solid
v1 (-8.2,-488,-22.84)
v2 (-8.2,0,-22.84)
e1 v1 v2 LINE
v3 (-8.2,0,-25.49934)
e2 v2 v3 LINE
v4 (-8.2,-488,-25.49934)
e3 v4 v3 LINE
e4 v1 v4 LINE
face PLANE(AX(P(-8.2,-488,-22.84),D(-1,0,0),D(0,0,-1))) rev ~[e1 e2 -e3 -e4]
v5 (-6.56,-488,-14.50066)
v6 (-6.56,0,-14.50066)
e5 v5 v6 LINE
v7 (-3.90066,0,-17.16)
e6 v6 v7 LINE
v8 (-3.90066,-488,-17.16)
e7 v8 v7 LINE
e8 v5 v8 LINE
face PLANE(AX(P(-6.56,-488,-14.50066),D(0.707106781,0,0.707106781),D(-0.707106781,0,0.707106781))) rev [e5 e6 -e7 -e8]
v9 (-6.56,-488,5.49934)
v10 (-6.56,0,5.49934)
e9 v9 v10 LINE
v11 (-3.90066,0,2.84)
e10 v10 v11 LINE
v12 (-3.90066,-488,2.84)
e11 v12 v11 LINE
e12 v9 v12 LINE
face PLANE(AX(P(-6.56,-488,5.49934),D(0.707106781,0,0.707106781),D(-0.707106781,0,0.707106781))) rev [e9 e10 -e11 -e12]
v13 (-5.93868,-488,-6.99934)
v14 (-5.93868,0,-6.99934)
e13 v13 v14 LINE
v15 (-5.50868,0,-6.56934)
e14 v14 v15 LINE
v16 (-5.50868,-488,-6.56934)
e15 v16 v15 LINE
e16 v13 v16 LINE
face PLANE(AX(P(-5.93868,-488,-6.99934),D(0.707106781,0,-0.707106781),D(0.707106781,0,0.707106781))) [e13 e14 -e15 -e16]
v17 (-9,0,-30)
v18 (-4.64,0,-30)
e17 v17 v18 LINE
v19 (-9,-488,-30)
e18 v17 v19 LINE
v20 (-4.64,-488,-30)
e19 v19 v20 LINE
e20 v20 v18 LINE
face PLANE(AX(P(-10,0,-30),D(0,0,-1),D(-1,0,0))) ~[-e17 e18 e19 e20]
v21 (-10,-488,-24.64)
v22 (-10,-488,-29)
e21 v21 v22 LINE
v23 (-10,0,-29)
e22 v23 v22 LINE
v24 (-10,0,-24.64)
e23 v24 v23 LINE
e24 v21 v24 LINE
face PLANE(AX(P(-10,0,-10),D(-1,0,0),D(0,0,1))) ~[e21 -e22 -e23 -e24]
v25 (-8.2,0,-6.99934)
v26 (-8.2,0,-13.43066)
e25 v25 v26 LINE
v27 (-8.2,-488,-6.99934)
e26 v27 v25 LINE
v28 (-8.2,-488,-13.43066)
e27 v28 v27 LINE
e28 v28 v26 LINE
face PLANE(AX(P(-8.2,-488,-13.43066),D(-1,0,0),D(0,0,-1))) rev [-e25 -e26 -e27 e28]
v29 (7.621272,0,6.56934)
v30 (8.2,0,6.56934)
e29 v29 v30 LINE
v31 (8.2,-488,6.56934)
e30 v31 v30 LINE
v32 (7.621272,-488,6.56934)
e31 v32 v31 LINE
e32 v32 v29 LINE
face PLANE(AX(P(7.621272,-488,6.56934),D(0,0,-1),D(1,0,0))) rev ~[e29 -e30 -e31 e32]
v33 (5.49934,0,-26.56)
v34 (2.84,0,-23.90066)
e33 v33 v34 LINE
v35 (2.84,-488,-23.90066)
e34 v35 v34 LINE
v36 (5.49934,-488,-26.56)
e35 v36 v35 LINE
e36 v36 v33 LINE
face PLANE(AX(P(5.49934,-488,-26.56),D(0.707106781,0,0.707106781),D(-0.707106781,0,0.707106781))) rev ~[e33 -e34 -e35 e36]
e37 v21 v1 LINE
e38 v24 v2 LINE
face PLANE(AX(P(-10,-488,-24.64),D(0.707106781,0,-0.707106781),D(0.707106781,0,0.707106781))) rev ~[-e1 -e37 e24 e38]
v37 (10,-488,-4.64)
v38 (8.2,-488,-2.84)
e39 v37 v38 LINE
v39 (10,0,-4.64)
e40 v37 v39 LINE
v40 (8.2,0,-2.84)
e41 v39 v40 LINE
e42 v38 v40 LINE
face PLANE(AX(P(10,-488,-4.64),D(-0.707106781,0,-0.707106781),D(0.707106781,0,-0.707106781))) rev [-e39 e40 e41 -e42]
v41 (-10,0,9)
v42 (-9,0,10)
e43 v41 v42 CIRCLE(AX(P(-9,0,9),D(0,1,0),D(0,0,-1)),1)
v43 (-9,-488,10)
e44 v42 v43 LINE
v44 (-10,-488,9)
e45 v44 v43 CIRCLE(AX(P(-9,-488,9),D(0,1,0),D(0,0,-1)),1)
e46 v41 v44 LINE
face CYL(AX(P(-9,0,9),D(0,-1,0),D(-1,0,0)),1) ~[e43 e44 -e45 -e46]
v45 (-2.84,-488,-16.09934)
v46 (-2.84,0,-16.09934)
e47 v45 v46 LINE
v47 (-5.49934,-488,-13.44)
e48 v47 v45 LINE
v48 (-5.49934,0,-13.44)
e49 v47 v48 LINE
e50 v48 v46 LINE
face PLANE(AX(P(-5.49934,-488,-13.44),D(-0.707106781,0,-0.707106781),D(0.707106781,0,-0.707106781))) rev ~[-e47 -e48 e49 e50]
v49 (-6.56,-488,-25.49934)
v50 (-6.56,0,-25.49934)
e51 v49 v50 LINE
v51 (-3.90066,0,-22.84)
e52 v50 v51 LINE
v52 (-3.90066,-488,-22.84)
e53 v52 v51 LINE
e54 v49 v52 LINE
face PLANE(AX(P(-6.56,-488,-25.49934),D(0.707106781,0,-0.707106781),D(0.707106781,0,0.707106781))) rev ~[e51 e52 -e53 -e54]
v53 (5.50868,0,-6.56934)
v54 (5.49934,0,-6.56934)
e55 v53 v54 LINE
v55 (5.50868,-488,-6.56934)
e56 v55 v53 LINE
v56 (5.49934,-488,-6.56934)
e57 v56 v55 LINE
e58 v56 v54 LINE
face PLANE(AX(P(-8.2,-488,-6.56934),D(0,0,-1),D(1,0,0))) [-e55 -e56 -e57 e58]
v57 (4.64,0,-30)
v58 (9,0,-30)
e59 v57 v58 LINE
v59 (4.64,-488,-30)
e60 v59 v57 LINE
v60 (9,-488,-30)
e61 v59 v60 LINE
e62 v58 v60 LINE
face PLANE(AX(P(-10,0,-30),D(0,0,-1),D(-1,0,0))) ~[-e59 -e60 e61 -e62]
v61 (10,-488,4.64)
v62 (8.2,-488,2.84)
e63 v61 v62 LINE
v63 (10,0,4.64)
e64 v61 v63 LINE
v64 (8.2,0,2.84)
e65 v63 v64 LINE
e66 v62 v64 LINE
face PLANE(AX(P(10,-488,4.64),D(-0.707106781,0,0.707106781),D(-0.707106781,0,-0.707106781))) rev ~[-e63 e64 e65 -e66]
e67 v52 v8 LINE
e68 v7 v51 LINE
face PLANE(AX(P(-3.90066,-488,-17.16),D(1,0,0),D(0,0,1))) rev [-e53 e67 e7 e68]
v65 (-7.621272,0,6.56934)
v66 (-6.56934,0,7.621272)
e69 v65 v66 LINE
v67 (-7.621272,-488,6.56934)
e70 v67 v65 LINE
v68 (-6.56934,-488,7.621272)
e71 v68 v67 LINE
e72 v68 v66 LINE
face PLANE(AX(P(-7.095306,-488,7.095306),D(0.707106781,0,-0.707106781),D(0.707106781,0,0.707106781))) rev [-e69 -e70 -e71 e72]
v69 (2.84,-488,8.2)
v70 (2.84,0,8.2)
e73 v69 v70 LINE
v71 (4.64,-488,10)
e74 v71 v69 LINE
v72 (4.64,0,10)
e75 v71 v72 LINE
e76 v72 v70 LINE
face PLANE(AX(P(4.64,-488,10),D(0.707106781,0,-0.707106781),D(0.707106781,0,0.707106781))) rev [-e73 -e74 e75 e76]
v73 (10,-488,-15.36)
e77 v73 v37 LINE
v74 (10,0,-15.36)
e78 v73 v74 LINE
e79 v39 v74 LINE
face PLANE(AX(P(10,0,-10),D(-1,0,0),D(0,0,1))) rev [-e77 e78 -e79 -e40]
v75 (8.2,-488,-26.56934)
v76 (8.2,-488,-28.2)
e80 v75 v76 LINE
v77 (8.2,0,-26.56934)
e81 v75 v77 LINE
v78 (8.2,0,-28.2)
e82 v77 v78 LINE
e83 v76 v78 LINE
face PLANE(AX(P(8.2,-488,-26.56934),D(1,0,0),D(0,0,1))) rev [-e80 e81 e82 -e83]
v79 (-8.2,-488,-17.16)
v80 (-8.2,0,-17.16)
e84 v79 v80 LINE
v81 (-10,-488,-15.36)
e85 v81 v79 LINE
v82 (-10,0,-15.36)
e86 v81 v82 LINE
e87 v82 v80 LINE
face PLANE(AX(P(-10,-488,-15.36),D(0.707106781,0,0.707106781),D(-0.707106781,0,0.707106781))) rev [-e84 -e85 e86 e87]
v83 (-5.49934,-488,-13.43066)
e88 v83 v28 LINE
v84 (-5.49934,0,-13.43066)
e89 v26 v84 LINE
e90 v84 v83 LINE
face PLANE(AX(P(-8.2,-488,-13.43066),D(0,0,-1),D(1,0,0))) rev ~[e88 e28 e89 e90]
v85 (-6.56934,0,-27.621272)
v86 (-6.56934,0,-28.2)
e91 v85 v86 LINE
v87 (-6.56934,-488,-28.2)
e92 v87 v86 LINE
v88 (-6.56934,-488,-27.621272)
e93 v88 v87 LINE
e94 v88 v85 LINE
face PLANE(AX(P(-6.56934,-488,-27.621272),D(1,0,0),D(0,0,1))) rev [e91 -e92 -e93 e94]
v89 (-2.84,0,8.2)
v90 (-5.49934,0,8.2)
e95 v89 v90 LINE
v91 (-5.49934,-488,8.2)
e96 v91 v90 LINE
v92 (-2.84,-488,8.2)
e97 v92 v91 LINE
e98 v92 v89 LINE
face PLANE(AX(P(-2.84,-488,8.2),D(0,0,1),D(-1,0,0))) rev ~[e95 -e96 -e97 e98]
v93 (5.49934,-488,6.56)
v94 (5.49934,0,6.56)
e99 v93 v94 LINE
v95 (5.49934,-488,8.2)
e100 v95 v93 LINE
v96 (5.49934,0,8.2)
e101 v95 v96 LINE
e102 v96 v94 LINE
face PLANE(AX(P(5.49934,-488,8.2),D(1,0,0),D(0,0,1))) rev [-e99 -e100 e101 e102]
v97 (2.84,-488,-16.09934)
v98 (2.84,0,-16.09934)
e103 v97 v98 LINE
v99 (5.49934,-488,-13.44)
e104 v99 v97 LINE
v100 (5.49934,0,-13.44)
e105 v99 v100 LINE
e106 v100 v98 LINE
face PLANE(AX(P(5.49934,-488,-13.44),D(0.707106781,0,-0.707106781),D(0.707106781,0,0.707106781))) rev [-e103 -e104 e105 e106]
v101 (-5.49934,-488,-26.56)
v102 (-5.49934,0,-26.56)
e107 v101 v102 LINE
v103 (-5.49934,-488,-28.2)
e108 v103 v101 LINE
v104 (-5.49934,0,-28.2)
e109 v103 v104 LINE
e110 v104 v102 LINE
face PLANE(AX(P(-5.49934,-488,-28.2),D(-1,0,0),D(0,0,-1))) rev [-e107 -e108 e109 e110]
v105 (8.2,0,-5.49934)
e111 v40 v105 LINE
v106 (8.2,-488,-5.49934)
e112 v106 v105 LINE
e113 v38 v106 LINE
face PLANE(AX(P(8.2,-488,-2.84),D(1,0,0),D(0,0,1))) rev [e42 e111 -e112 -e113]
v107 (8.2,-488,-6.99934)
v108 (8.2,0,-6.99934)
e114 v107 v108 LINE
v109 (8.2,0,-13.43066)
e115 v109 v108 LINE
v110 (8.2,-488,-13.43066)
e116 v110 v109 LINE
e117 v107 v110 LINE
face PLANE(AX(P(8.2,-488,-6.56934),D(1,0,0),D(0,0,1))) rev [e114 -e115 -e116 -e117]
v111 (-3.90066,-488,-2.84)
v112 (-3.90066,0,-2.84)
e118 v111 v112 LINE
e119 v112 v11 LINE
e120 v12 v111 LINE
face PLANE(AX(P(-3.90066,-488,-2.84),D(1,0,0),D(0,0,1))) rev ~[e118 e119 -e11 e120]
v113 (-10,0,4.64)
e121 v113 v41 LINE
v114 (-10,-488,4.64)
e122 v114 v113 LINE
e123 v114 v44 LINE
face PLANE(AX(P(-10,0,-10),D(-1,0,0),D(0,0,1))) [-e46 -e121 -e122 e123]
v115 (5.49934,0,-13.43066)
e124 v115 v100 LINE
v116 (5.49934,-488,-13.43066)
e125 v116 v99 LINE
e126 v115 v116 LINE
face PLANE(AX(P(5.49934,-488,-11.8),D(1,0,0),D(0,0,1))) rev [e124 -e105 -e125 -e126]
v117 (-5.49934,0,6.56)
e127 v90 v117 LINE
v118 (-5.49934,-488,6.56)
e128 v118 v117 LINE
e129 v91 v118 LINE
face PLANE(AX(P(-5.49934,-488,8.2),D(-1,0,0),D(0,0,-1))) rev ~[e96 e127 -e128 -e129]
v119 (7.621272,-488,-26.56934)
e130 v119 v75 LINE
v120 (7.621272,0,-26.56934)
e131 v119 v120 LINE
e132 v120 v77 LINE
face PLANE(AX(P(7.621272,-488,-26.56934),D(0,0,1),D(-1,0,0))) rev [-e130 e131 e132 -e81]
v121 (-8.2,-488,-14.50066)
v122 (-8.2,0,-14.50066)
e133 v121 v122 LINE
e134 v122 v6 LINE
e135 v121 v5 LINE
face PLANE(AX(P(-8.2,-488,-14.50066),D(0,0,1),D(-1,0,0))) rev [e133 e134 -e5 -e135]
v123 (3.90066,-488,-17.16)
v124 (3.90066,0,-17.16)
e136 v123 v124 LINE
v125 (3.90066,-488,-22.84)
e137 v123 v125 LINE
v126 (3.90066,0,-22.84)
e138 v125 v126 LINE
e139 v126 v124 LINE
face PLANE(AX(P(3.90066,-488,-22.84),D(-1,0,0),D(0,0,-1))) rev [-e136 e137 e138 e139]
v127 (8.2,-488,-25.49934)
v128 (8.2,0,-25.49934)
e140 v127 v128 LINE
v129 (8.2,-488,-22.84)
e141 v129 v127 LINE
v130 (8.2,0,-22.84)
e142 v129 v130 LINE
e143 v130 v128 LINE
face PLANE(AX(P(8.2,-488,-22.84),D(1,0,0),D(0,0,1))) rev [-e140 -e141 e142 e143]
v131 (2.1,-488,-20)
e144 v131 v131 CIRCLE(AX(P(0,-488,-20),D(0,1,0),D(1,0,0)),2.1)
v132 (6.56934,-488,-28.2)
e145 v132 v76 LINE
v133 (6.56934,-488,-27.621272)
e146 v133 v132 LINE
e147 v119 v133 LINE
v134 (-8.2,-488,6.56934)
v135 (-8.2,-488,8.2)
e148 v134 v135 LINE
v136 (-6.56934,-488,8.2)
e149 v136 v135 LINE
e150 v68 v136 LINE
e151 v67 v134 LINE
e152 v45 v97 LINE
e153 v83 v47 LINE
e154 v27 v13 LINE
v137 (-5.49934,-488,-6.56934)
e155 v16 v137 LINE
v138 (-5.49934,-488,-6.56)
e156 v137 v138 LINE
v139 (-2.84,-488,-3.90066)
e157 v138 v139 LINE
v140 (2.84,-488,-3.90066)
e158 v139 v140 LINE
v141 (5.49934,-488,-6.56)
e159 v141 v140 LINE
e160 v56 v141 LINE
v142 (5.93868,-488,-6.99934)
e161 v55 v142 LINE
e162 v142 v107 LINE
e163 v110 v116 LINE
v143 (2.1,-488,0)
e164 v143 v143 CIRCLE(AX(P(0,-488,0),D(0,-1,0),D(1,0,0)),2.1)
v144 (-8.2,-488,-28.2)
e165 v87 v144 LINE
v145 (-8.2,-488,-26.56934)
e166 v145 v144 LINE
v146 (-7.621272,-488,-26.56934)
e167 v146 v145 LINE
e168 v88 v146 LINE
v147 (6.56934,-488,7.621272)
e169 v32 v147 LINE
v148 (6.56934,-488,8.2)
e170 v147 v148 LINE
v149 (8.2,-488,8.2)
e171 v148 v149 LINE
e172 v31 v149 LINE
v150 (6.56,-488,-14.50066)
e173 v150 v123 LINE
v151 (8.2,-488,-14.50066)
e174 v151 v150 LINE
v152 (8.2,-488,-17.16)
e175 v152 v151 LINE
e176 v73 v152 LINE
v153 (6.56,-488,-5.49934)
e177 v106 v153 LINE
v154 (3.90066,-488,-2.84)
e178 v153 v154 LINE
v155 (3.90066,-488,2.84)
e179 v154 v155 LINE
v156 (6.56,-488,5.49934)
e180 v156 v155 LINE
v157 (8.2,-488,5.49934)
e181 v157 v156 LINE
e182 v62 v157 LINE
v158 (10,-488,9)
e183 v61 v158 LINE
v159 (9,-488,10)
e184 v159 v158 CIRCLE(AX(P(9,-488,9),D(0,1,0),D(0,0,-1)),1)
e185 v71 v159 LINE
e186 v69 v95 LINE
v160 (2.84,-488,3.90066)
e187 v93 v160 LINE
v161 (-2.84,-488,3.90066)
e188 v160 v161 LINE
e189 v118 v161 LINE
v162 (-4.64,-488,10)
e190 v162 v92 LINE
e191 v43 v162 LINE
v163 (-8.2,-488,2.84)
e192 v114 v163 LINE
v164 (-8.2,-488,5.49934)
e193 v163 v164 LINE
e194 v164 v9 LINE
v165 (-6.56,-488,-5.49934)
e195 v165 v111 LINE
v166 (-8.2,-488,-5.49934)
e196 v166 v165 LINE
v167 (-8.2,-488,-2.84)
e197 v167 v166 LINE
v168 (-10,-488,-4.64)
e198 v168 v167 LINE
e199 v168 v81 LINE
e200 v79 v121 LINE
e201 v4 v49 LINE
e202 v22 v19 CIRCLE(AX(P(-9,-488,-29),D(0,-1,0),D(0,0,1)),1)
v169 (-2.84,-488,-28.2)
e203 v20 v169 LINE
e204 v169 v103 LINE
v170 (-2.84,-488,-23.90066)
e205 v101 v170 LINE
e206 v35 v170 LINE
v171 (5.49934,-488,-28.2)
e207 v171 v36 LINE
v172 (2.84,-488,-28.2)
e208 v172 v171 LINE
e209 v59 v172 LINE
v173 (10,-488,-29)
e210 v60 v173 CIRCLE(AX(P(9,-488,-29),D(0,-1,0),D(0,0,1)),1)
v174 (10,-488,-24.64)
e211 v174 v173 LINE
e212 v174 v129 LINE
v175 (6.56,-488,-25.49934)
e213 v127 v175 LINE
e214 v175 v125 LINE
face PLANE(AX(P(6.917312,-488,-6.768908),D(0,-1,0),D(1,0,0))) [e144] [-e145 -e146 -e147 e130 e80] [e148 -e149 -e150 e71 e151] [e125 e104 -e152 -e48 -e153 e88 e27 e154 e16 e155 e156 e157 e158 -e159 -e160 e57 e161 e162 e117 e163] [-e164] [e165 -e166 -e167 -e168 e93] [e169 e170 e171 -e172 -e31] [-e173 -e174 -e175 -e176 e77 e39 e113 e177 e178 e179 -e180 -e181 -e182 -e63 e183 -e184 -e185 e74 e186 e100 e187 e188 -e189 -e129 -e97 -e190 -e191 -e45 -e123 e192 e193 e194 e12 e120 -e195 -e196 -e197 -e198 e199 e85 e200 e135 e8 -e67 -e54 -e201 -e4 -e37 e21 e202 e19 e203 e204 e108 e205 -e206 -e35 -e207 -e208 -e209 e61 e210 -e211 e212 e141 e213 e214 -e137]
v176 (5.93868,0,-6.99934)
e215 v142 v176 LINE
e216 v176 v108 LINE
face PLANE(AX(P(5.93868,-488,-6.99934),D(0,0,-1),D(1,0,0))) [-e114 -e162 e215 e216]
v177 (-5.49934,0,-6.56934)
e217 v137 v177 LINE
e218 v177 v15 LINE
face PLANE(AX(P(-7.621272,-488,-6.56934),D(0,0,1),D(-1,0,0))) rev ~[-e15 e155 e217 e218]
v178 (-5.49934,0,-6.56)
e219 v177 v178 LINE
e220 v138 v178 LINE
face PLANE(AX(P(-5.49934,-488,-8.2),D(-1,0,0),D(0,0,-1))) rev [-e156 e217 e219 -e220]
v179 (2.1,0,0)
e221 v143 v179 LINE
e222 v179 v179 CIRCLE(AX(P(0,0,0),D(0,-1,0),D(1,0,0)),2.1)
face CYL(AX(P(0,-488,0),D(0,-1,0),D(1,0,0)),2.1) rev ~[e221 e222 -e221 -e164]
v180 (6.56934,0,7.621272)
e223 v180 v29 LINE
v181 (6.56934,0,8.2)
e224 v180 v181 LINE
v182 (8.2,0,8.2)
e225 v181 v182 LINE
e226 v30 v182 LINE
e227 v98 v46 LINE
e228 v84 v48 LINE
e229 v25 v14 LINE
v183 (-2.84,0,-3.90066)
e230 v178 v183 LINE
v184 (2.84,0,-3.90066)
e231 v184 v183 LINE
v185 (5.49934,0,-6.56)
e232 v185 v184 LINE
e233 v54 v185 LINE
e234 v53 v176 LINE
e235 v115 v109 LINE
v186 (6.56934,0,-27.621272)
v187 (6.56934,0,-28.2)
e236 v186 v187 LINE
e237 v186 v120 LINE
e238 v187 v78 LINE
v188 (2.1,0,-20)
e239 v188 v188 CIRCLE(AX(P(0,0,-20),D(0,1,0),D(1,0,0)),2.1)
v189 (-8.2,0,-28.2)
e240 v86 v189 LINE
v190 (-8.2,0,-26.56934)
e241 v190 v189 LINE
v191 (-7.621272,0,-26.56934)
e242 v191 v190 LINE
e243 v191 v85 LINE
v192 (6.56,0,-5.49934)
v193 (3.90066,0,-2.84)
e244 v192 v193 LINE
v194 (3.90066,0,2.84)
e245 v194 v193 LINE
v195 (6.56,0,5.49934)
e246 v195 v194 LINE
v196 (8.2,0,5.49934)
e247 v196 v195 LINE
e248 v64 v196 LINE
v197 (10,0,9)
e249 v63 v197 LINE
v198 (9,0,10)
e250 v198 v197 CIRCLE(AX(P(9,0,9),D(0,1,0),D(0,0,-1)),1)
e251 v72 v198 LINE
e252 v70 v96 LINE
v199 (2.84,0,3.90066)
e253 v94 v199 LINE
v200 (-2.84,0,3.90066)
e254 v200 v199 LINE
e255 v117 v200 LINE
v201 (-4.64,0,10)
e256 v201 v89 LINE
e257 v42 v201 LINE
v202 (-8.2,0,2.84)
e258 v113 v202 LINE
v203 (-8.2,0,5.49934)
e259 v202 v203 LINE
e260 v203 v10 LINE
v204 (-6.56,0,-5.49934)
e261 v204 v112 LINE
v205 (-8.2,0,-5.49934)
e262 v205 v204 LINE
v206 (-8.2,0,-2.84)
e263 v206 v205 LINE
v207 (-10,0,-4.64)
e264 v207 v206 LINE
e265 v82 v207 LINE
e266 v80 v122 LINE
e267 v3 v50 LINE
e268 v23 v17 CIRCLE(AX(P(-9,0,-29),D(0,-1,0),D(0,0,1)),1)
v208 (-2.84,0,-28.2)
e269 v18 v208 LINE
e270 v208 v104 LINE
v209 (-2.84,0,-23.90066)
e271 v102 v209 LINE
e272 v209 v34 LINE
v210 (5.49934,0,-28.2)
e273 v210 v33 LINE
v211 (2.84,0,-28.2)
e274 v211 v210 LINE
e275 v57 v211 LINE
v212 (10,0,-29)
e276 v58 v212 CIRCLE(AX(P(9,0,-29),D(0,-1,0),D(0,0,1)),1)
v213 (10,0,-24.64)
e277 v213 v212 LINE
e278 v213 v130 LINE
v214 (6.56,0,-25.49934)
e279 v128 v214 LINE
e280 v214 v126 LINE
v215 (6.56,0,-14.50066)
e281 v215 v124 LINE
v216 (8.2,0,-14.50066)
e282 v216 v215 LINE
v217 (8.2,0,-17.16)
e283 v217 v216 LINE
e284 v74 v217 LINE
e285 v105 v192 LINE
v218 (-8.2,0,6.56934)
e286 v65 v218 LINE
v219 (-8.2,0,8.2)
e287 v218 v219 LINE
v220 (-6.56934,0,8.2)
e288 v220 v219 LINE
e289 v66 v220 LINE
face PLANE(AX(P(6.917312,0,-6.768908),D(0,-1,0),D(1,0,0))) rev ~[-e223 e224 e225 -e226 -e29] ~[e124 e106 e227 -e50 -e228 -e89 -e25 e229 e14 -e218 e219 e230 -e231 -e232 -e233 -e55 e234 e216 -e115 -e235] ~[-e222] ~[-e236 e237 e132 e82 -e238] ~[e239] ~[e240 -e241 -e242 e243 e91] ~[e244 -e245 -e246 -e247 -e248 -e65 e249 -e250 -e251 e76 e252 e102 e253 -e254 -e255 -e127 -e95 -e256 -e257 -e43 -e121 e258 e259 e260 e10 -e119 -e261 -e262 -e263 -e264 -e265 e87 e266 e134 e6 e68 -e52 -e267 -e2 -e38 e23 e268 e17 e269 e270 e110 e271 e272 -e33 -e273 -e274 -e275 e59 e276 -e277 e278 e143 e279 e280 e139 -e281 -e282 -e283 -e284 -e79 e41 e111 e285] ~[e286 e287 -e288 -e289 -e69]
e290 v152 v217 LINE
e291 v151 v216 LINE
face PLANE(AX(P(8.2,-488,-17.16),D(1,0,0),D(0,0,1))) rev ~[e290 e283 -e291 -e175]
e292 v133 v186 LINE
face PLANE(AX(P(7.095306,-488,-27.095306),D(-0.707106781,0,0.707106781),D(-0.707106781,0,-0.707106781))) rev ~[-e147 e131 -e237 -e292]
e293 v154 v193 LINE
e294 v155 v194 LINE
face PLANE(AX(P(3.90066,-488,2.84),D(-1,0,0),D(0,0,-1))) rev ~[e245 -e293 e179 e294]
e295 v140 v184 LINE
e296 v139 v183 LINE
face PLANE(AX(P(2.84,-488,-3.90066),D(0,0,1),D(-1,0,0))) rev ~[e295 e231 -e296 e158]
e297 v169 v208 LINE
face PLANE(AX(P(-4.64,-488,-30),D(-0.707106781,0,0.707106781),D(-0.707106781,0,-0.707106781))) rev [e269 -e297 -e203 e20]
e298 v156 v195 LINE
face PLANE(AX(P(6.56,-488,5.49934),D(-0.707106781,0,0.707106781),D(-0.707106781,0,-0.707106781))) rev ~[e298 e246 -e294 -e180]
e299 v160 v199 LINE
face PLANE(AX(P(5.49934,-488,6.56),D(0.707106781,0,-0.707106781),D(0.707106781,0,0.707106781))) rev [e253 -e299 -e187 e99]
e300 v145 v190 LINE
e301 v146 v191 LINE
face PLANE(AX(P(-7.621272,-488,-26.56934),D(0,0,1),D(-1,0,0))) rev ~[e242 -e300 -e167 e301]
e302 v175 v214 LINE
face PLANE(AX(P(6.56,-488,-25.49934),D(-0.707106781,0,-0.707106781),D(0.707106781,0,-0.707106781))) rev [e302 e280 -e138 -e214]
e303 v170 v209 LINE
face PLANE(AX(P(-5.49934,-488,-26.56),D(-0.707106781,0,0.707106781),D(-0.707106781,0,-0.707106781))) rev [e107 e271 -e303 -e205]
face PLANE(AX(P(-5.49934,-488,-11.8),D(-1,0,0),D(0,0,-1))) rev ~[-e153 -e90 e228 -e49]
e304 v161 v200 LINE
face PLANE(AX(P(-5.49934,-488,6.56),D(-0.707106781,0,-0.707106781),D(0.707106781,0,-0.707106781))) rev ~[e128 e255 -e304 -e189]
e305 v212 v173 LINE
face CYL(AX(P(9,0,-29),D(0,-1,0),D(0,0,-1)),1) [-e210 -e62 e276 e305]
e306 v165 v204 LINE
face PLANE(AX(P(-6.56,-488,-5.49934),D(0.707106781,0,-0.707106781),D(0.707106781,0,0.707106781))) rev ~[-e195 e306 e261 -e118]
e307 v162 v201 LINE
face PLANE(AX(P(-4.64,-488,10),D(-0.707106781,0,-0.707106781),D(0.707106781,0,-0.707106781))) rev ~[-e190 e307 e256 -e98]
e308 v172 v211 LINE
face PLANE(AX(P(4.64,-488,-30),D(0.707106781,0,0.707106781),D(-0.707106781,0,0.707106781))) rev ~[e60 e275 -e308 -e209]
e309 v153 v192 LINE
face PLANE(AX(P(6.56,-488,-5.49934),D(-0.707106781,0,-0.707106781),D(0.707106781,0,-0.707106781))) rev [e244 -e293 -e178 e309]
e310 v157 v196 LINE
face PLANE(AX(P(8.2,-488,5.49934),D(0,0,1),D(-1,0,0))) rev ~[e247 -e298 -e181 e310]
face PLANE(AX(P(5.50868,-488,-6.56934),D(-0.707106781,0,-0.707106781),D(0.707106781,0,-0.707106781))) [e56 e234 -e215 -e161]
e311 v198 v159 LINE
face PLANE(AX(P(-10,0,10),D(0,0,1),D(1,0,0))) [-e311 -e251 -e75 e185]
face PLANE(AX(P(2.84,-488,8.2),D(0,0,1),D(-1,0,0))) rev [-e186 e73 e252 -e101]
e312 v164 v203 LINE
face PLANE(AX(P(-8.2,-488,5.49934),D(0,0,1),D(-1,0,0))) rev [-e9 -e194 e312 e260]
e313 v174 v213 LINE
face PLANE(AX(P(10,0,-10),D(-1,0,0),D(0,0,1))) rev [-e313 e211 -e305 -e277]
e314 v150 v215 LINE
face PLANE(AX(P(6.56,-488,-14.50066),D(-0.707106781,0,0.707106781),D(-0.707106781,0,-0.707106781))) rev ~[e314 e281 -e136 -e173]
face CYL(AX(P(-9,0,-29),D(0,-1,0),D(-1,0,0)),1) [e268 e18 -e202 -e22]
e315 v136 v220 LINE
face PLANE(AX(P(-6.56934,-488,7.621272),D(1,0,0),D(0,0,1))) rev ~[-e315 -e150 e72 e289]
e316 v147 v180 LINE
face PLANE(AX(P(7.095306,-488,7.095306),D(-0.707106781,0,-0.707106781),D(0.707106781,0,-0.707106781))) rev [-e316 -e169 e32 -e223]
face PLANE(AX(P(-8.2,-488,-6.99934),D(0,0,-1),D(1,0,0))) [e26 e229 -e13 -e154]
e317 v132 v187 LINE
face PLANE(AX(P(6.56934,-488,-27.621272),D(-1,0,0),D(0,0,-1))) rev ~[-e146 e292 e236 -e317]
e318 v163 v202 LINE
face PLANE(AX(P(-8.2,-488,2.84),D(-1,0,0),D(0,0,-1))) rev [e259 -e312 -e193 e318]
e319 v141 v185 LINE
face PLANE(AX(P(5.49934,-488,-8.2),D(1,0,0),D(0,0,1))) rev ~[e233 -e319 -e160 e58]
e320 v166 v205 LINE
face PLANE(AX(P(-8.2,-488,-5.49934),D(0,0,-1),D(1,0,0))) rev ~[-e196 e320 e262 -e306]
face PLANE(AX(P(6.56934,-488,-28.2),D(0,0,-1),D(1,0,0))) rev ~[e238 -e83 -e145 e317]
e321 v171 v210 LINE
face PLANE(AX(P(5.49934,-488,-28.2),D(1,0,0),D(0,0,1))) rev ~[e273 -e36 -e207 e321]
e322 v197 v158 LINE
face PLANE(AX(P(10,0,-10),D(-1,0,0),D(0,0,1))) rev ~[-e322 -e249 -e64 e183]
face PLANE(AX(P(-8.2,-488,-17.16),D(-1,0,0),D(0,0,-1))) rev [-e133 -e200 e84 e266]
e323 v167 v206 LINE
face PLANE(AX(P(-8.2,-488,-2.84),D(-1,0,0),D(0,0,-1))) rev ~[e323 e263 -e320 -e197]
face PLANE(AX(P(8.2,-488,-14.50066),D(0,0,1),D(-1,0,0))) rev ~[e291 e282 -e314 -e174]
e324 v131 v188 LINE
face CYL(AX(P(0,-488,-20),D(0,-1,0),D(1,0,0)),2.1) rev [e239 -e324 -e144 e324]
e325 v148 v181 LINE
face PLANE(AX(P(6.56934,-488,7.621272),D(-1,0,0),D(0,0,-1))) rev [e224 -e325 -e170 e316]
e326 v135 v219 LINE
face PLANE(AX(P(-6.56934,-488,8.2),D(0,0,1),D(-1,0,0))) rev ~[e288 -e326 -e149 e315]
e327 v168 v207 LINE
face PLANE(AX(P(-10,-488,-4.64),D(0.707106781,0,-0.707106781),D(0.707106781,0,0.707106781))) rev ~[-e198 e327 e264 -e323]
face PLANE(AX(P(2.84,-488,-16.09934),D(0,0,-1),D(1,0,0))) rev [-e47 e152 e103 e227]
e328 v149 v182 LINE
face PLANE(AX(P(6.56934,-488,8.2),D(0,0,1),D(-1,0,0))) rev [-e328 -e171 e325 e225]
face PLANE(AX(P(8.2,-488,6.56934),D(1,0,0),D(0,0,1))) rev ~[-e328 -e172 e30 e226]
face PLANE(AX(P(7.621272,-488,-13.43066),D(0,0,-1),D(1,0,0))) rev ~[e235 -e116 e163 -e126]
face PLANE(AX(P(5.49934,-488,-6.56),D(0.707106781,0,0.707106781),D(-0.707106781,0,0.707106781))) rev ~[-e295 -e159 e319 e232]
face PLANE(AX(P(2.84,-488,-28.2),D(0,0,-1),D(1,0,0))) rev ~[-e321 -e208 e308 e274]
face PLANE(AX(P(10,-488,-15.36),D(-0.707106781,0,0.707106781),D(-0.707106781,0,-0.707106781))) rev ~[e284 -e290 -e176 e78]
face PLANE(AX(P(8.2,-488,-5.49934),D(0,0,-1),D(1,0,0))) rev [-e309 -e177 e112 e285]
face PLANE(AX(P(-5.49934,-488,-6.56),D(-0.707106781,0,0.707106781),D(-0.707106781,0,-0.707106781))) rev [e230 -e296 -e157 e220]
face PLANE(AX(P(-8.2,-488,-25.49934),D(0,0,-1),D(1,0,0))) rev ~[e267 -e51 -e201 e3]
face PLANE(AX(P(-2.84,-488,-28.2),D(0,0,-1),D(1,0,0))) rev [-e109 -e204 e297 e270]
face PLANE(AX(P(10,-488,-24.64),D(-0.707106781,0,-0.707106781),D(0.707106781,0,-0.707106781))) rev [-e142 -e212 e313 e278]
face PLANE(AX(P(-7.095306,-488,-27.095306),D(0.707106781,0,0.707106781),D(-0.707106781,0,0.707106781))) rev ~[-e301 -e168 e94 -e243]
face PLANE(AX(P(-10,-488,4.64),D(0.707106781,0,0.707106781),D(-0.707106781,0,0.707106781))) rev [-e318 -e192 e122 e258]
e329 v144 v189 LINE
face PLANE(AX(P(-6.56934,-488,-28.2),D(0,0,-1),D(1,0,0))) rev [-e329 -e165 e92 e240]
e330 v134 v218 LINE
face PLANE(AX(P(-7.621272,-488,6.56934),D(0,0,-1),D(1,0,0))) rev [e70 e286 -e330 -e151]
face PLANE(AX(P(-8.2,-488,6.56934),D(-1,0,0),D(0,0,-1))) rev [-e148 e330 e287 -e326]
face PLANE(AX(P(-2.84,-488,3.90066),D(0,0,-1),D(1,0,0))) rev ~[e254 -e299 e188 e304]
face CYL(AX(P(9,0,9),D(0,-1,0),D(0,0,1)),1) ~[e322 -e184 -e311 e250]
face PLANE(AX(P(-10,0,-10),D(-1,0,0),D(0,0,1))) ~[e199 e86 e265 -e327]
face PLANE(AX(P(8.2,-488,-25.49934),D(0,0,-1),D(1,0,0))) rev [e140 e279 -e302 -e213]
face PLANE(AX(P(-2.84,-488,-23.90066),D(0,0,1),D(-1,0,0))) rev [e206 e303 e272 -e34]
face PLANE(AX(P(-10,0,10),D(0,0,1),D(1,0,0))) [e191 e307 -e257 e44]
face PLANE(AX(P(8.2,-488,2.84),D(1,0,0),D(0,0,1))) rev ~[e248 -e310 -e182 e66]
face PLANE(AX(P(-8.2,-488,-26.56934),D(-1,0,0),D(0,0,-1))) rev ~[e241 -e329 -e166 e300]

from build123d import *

# Parameters (mm, degrees)
F0_W             = 20
F0_H             = 20
F1_DEPTH         = 488
F2_R             = 2.1
F3_DEPTH         = 488.001
F4_R             = 1
F6_DEPTH         = 488.001
F6_COPIES3_COUNT = 2
F6_COPIES3_ANGLE = 90
F6_COPIES4_COUNT = 2
F6_COPIES4_ANGLE = 270
F6_COPIES6_COUNT = 2
F9_W             = 16.4
F9_H             = 6.8613203436
F10_DEPTH        = 488.001
F12_DEPTH        = 488


# Not quite as in the source:
# - a pattern or mirror of a feature is missing from the dataset's text; its kind, count and spacing are read off the source's solid


with BuildPart() as f1:
    # F0 (on Front) → F1 (new body)
    with BuildSketch(Plane.XZ):
        Rectangle(F0_W, F0_H)
    extrude(amount=F1_DEPTH)

    # F2 (on face) → F3 (cut, through all)
    with BuildSketch(Plane.XZ.offset(488)):
        Circle(F2_R)
    extrude(amount=-F3_DEPTH, mode=Mode.SUBTRACT)

    # F4
    f4_edges = [f1.edges().sort_by_distance(p)[0] for p in [
        (-10, -244, 10),
        (10, -244, 10),
    ]]
    fillet(f4_edges, radius=F4_R)

    # F5 (on face) → F6 (cut, through all)
    with BuildSketch(Plane.XZ.offset(488)):
        Polygon((0, 3.9006601718), (0, 10), (-2.84, 10), (-4.64, 10), (-2.84, 8.2), (-5.4993398282, 8.2), (-5.4993398282, 6.56), (-2.84, 3.9006601718), align=None)
        Polygon((-6.5693398282, 8.2), (-8.2, 8.2), (-7.0953059148, 7.0953059148), (-6.5693398282, 7.6212720014), align=None)
    f6 = extrude(amount=-F6_DEPTH, mode=Mode.SUBTRACT)

    # F6_copies: F6 across plane
    add(f6.mirror(Plane(origin=(0, 0, 0), x_dir=(-0.7071067812, 0, -0.7071067812), z_dir=(0.7071067812, 0, -0.7071067812))), mode=Mode.SUBTRACT)

    # F6_copies1: F6 across plane
    add(f6.mirror(Plane(origin=(0, 0, 0), x_dir=(0.7071067812, 0, -0.7071067812), z_dir=(-0.7071067812, 0, -0.7071067812))), mode=Mode.SUBTRACT)

    # F6_copies2: F6 across plane
    add(f6.mirror(Plane(origin=(0, 0, 0), x_dir=(0, 0, 1), z_dir=(1, 0, 0))), mode=Mode.SUBTRACT)

    # F6_copies3: F6 ×2 about axis
    f6_copies3_axis = Axis((0, 0, 0), (0, 1, 0))
    for i in range(1, F6_COPIES3_COUNT):
        add(f6.rotate(f6_copies3_axis, i * F6_COPIES3_ANGLE / (F6_COPIES3_COUNT - 1)), mode=Mode.SUBTRACT)

    # F6_copies4: F6 ×2 about axis
    f6_copies4_axis = Axis((0, 0, 0), (0, 1, 0))
    for i in range(1, F6_COPIES4_COUNT):
        add(f6.rotate(f6_copies4_axis, i * F6_COPIES4_ANGLE / (F6_COPIES4_COUNT - 1)), mode=Mode.SUBTRACT)

    # F6_copies5: F6 across plane
    add(f6.mirror(Plane(origin=(0, 0, 0), x_dir=(-1, 0, 0), z_dir=(0, 0, -1))), mode=Mode.SUBTRACT)

    # F6_copies6: F6 ×2 about axis
    f6_copies6_axis = Axis((0, 0, 0), (0, 1, 0))
    for i in range(1, F6_COPIES6_COUNT):
        add(f6.rotate(f6_copies6_axis, i * 360 / F6_COPIES6_COUNT), mode=Mode.SUBTRACT)

    # F8: F1 across face


with BuildPart() as f1_1:
    add(f1.part)
    add(f1.part.mirror(Plane(origin=(-7.32, -244, -10), x_dir=(1, 0, 0), z_dir=(0, 0, -1))))

    # F9 (on face) → F10 (cut, through all)
    with BuildSketch(Plane.XZ.offset(488)):
        with Locations((0, -10)):
            Rectangle(F9_W, F9_H)
    extrude(amount=-F10_DEPTH, mode=Mode.SUBTRACT)

    # F11 (on face) → F12 (join, through all)
    with BuildSketch(Plane.XZ.offset(488)):
        with BuildLine():
            ThreePointArc((-9, -10), (-9.7071067812, -9.7071067812), (-10, -9))
            Line((-10, -9), (-10, -11))
            ThreePointArc((-10, -11), (-9.7071067812, -10.2928932188), (-9, -10))
        make_face()
        with BuildLine():
            ThreePointArc((10, -9), (9.7071067812, -9.7071067812), (9, -10))
            ThreePointArc((9, -10), (9.7071067812, -10.2928932188), (10, -11))
            Line((10, -11), (10, -9))
        make_face()
        Polygon((5.9386796564, -6.9993398282), (8.2, -6.9993398282), (8.2, -6.5693398282), (5.5086796564, -6.5693398282), align=None)
        Polygon((-8.2, -6.5693398282), (-8.2, -6.9993398282), (-5.9386796564, -6.9993398282), (-5.5086796564, -6.5693398282), align=None)
    extrude(amount=-F12_DEPTH)


solid = f1_1.part
